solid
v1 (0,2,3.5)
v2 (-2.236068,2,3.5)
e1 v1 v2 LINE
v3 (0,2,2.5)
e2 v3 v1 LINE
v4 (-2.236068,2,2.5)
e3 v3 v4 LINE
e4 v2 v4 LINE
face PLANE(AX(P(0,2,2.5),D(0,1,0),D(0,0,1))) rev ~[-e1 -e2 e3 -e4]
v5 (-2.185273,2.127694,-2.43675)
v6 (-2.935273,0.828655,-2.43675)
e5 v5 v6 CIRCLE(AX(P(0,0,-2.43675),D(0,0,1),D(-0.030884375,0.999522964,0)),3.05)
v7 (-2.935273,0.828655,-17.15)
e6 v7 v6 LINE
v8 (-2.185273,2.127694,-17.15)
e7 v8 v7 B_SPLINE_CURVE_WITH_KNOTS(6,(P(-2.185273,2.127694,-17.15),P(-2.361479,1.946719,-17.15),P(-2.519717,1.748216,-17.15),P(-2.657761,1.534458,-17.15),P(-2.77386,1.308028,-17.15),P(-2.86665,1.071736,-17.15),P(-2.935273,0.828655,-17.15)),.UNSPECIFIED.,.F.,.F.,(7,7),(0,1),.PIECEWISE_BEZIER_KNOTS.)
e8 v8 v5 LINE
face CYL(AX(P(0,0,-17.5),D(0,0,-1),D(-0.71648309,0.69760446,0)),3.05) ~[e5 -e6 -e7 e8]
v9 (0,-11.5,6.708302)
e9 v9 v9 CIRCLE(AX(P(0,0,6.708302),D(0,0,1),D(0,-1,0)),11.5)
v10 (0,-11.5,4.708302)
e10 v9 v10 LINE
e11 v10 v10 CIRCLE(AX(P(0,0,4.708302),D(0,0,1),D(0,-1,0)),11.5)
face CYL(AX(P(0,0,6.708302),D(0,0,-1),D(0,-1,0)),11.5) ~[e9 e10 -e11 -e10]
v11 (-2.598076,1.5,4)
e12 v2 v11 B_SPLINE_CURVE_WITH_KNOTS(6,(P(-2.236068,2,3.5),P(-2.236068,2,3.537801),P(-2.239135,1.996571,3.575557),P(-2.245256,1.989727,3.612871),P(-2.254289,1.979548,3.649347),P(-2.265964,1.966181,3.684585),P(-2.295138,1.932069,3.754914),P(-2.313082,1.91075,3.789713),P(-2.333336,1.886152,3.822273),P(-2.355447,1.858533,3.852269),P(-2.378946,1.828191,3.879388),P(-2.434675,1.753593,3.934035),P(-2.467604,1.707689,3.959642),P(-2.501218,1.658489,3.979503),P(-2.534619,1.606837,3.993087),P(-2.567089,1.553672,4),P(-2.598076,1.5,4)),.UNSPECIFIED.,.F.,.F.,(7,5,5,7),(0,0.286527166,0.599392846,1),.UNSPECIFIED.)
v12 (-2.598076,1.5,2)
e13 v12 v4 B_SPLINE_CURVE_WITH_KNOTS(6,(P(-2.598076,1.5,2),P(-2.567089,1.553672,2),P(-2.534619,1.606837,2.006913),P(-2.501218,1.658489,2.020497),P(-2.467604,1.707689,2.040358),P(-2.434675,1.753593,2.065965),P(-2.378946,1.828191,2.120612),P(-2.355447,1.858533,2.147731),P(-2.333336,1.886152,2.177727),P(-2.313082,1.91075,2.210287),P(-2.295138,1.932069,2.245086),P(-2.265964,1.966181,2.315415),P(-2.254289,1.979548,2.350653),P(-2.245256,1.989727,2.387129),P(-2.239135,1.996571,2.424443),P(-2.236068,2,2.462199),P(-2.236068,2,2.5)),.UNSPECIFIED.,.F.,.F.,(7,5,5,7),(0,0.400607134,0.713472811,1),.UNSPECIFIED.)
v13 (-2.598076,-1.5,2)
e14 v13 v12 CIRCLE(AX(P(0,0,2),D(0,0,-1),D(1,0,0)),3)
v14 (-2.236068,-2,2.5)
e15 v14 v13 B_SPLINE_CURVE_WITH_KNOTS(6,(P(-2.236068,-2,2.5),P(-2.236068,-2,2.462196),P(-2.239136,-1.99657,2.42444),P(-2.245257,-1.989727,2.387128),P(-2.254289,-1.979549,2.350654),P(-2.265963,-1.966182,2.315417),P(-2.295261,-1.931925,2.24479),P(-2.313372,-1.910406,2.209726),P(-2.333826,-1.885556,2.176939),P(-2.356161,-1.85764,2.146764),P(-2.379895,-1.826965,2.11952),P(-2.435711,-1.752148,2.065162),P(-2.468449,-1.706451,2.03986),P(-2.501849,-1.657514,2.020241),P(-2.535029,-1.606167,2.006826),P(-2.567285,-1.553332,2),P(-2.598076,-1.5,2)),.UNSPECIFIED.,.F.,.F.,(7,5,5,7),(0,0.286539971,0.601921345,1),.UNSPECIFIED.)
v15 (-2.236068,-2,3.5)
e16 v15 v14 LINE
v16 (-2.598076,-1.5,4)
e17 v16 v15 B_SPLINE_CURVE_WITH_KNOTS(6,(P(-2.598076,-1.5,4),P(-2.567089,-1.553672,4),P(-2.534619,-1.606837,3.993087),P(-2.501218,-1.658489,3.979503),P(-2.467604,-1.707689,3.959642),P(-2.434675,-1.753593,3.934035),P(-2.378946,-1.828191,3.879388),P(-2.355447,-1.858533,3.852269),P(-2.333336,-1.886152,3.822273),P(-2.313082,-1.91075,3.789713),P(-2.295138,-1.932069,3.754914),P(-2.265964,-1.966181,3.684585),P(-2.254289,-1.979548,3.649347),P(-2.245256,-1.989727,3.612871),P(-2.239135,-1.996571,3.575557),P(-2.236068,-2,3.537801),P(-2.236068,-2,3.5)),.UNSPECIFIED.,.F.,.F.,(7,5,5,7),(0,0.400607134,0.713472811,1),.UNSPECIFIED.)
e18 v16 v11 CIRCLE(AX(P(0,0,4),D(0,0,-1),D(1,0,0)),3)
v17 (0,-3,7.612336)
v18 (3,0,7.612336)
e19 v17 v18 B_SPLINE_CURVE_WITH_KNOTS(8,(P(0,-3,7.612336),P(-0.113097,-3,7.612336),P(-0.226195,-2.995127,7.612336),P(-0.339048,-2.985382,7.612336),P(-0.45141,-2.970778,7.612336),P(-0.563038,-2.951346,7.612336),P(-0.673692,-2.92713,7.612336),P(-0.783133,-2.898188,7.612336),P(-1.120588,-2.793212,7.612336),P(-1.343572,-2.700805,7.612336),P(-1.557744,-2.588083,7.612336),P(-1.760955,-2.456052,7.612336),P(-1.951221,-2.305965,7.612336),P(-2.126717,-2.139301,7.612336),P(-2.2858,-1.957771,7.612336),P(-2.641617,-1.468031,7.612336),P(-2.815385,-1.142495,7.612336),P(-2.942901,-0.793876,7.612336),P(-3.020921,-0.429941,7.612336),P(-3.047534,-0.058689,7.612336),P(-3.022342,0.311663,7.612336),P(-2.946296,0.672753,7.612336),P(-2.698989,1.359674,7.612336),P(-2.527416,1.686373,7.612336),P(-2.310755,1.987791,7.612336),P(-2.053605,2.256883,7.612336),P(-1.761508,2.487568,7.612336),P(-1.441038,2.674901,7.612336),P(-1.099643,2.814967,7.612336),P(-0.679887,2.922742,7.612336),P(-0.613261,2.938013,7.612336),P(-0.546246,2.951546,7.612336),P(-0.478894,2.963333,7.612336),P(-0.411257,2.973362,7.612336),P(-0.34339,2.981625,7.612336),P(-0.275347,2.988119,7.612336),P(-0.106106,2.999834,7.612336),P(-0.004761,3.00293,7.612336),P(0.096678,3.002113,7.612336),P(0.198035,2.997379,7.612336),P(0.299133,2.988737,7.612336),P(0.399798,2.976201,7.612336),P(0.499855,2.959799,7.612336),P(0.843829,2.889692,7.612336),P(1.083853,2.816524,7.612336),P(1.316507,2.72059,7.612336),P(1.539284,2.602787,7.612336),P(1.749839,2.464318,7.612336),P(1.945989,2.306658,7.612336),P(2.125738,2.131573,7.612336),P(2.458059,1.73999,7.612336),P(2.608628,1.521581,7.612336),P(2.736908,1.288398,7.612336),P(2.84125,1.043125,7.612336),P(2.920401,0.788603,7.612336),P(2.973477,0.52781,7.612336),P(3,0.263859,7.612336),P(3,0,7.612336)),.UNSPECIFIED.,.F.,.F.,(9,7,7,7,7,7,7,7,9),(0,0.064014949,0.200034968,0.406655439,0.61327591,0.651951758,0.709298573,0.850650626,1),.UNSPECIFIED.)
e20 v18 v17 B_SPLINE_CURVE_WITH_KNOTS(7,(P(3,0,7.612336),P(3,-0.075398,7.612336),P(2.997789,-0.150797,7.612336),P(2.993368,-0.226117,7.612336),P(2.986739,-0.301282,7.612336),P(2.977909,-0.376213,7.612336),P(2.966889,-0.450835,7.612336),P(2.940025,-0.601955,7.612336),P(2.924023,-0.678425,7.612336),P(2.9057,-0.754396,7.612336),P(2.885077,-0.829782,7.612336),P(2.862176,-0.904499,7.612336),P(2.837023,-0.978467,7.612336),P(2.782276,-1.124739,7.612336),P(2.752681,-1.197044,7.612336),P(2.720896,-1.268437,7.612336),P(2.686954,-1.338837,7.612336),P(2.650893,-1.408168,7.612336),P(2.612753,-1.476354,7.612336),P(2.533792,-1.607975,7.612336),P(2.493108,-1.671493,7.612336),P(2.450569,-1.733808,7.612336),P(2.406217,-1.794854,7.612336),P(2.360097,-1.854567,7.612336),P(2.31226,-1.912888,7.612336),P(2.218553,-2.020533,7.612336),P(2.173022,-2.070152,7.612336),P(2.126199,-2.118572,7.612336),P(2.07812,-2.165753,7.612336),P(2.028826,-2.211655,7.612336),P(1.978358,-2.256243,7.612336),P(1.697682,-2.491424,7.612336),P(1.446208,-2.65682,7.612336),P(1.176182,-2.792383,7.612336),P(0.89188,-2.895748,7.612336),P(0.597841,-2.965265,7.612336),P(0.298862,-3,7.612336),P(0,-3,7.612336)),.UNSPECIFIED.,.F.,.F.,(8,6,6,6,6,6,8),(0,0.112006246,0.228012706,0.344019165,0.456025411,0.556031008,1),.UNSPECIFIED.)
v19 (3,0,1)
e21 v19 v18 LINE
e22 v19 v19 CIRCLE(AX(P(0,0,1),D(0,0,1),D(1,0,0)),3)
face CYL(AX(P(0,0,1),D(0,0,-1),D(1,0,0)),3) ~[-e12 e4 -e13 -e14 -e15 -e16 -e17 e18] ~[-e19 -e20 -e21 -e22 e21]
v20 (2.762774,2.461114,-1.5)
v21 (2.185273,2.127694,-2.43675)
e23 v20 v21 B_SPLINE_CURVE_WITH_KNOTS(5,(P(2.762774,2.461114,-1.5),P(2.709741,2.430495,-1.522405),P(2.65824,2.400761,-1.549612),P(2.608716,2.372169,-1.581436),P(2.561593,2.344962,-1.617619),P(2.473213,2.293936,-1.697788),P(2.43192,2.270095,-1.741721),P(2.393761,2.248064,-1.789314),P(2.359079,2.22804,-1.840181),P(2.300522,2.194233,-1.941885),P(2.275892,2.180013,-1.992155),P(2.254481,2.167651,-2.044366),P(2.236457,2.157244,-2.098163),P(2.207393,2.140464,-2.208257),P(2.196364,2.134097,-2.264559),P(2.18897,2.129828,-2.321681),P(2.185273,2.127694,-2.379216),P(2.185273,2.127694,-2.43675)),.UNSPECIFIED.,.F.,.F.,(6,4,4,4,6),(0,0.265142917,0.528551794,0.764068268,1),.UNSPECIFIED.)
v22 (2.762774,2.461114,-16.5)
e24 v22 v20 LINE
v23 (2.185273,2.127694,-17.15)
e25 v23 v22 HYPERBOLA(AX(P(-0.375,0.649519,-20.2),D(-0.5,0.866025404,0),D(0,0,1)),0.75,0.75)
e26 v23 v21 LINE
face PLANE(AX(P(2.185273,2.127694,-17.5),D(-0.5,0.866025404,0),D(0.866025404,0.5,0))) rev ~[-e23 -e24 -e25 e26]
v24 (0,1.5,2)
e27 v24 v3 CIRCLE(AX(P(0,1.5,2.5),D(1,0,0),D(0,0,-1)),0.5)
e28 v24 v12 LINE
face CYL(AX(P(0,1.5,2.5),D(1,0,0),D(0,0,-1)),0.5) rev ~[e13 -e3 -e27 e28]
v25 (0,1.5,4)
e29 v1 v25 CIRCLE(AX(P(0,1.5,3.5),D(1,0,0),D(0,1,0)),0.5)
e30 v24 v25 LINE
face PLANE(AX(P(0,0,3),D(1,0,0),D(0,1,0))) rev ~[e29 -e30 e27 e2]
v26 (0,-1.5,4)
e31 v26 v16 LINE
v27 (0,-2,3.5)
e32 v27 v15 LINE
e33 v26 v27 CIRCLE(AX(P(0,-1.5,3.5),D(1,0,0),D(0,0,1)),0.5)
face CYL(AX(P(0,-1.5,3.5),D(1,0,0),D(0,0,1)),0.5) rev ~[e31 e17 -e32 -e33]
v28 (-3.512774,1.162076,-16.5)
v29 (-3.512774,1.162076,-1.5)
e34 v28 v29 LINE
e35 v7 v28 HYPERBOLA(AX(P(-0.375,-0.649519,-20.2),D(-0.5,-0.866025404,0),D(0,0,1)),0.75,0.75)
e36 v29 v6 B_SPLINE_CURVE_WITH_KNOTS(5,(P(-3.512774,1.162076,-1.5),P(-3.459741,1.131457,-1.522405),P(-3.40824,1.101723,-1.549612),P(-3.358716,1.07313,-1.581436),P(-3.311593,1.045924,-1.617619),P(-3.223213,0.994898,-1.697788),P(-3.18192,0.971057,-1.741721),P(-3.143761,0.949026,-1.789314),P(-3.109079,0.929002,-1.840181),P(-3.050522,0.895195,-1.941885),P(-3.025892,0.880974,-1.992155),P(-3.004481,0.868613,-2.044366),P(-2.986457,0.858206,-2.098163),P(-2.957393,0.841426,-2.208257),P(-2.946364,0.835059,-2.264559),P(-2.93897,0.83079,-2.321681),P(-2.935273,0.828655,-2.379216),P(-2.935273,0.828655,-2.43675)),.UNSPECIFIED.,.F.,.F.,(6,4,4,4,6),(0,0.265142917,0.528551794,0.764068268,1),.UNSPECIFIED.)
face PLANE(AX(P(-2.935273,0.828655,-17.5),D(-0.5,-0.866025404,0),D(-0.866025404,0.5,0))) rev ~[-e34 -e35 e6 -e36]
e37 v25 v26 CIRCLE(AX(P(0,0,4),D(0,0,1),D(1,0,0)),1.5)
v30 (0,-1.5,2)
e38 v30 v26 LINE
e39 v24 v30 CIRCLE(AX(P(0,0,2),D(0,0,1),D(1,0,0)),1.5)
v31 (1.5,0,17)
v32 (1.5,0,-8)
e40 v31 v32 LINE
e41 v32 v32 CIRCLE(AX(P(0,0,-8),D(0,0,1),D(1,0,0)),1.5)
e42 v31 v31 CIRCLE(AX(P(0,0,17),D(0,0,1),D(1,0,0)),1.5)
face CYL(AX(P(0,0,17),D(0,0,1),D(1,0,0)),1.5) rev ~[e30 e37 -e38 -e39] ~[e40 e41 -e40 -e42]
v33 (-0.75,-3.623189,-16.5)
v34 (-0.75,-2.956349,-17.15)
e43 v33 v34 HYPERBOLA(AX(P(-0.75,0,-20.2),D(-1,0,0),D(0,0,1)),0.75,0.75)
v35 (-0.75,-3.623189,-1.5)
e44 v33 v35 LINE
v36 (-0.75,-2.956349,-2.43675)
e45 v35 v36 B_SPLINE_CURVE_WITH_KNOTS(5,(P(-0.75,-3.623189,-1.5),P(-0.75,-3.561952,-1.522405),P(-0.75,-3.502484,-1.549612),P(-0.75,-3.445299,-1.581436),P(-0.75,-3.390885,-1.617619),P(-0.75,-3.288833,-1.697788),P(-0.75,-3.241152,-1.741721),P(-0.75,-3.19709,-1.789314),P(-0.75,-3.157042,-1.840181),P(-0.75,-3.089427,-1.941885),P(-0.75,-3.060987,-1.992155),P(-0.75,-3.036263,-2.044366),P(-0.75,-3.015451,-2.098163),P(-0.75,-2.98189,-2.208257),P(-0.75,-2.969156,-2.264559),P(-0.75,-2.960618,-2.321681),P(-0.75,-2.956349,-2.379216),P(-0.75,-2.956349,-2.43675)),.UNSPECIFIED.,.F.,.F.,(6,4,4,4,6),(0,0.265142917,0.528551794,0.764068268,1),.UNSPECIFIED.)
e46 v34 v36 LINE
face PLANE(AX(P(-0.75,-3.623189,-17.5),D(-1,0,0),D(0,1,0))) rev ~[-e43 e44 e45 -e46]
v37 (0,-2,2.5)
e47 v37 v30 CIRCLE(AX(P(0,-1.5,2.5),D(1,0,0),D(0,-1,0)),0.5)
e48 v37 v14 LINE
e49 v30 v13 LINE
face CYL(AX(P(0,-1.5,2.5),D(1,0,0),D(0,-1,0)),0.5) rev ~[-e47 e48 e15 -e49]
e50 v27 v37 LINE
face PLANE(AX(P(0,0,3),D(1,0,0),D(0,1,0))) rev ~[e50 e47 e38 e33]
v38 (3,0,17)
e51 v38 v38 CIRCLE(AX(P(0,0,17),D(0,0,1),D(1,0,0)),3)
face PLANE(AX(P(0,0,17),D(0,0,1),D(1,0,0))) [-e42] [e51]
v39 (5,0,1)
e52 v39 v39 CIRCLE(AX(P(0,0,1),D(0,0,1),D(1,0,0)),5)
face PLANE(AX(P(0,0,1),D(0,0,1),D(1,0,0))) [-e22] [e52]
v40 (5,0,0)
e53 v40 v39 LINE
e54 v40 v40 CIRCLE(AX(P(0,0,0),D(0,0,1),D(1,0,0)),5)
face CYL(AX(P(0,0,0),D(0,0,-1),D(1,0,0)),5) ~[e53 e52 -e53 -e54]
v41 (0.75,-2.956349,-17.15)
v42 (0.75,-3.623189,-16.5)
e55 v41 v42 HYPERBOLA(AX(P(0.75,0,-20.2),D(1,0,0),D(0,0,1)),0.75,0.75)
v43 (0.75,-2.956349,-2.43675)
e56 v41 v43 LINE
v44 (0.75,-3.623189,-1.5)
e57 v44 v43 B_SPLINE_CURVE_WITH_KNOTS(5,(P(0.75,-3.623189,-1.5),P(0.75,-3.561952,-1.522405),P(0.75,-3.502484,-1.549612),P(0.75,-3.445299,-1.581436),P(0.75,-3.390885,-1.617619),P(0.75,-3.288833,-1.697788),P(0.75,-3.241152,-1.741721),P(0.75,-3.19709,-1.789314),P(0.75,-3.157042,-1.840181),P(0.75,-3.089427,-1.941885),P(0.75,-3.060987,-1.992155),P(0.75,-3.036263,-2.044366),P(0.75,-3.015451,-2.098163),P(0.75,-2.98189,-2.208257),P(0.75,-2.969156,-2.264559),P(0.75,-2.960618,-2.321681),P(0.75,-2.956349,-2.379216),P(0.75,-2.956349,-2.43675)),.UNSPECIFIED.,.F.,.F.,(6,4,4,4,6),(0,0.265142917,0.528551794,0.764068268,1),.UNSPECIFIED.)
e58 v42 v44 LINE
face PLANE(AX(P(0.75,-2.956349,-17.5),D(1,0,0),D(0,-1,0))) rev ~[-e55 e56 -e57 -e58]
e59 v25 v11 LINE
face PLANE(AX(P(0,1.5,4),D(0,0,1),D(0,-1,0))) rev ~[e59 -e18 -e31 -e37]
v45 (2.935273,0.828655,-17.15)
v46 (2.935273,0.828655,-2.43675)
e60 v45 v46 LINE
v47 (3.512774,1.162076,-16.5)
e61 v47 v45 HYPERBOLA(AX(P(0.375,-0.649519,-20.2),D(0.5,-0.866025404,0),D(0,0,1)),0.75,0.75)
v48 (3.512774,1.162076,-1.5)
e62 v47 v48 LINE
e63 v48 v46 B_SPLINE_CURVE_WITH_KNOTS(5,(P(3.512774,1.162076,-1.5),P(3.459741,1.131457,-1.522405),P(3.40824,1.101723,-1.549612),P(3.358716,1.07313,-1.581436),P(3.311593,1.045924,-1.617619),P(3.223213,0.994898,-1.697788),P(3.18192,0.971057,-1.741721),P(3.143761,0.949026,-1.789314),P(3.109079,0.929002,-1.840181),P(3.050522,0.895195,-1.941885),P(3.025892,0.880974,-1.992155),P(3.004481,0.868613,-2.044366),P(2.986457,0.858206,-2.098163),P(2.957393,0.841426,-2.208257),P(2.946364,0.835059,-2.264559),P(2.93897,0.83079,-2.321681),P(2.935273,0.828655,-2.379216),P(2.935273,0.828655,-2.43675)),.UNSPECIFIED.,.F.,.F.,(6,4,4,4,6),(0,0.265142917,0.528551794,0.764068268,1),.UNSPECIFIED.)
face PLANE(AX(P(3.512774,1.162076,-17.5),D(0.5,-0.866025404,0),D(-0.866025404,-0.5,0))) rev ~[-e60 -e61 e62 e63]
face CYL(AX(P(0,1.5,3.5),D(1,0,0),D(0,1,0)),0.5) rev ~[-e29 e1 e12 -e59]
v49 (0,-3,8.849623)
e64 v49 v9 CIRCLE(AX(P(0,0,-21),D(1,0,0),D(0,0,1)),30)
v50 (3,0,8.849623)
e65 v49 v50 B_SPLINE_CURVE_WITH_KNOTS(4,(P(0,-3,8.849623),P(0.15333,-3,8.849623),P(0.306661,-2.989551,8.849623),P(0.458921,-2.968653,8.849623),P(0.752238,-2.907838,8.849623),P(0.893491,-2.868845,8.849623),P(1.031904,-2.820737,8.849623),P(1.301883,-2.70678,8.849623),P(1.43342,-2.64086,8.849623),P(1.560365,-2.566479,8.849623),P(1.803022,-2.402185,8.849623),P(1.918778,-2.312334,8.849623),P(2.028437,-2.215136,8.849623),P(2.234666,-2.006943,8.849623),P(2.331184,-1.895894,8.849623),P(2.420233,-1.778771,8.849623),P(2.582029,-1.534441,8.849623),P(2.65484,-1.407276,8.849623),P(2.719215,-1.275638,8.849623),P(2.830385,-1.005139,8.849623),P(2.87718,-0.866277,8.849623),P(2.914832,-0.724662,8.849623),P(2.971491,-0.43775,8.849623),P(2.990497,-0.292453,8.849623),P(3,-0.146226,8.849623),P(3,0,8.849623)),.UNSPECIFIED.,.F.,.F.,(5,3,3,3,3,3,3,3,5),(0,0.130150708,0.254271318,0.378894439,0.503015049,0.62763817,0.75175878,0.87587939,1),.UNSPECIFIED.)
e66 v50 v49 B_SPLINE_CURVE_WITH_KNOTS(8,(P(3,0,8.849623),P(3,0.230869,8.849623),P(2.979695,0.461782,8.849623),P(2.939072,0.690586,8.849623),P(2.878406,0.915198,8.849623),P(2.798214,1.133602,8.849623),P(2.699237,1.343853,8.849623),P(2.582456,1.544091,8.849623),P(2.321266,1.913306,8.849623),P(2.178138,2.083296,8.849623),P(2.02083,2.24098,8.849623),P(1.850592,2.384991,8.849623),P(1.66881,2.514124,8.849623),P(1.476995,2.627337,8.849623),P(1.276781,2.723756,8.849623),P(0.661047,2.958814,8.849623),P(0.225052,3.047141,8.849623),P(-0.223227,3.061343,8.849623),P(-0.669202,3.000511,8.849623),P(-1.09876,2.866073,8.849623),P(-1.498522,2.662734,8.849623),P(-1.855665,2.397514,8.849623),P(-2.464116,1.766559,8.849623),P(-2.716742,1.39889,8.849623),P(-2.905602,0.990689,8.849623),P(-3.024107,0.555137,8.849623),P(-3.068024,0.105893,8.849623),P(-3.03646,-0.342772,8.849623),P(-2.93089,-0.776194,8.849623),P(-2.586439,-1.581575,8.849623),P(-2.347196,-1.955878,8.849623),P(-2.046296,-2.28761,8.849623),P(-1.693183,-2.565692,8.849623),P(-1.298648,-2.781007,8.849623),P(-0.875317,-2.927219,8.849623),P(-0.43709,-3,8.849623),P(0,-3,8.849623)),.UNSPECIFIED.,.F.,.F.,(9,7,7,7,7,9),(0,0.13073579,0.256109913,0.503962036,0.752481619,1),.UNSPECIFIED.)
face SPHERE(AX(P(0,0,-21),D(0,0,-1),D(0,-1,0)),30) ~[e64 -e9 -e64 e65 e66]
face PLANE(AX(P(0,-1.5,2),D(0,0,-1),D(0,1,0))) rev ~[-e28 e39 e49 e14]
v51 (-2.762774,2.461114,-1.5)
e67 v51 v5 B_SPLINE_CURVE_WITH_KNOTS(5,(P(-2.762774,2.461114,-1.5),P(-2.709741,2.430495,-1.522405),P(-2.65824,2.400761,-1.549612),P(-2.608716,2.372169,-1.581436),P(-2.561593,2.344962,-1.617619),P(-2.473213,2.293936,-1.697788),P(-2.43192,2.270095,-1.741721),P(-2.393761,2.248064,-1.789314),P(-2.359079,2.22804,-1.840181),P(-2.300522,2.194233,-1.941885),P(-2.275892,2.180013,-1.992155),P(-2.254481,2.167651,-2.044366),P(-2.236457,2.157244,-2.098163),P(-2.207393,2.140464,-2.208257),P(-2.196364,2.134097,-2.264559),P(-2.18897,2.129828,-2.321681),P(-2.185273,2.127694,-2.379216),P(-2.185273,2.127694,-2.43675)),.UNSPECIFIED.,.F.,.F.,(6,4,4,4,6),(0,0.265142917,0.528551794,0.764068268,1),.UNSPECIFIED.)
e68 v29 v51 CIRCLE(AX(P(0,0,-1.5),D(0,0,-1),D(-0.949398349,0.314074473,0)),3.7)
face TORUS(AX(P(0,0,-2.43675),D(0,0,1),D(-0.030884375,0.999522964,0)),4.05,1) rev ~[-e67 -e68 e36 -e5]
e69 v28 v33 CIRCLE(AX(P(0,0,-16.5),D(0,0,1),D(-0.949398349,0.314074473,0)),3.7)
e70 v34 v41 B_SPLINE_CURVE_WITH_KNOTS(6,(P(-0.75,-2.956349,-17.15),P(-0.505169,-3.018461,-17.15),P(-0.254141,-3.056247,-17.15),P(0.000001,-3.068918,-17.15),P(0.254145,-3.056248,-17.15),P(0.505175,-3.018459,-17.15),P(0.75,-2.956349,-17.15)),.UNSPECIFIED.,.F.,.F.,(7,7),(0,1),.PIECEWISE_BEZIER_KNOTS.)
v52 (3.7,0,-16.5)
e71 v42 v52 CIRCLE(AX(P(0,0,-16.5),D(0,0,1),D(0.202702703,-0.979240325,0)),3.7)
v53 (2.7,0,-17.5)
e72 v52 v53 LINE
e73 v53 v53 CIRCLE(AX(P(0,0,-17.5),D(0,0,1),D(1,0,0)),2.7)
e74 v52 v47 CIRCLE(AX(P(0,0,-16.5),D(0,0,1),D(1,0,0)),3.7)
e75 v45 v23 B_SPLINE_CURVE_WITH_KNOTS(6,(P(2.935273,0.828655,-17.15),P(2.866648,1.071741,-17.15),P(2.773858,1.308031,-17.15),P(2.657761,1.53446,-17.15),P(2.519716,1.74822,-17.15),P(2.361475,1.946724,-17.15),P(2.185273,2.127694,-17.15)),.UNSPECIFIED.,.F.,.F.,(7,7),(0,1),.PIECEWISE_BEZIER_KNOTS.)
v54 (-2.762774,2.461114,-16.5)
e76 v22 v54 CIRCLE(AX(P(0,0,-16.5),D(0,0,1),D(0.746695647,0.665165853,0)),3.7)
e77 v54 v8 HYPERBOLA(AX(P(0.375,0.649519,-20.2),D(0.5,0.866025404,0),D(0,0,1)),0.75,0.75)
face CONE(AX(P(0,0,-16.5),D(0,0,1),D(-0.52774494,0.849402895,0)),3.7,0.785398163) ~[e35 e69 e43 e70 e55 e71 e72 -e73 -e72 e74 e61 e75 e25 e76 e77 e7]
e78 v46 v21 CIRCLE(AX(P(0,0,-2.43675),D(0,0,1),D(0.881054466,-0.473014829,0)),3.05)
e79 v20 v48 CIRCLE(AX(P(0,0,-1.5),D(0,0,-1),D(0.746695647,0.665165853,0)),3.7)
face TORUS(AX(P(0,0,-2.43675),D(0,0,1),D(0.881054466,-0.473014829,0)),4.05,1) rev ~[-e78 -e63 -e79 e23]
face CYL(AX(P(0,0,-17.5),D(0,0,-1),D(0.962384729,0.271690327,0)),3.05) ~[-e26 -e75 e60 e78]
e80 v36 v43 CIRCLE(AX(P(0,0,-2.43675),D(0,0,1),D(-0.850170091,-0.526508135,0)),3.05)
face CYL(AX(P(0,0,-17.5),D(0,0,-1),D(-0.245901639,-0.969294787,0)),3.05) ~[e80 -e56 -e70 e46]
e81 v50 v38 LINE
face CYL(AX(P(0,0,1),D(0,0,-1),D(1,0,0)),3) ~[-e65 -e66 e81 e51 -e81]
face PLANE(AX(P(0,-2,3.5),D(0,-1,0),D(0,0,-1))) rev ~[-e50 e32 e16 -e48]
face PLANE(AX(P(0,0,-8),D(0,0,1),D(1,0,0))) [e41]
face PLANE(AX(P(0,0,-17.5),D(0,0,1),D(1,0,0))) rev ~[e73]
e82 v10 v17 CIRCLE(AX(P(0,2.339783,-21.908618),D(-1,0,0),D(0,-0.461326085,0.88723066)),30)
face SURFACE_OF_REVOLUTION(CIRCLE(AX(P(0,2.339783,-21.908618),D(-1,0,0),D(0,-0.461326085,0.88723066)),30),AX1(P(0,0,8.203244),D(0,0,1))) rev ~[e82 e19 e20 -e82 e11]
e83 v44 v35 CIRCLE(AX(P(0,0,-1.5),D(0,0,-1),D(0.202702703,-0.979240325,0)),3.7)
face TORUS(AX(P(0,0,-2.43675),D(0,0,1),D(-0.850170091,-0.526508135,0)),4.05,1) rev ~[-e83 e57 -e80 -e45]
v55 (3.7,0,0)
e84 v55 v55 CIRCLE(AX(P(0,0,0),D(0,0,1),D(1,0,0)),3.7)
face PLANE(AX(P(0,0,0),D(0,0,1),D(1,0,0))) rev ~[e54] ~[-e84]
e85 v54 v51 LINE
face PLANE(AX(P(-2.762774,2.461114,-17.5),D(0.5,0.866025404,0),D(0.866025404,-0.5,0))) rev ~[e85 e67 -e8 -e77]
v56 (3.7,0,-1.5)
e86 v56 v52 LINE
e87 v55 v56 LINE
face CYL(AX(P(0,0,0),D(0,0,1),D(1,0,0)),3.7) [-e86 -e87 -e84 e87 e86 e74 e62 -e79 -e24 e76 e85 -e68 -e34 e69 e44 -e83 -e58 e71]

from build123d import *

# Parameters (mm, degrees)
F0_R        = 3.7
F1_DEPTH    = 17.5
F3_DEPTH    = 16
F4_T2_ANGLE = 116.4603484981
F4_T4_ANGLE = 116.4603484981
F4_T6_ANGLE = 116.4603484981
F5_T2_ANGLE = 176.2935685117
F5_T4_ANGLE = 176.2935685117
F5_T6_ANGLE = 58.1290115734
F5_T8_ANGLE = 118.1404591149
F6_R        = 5
F7_DEPTH    = 1
F8_R        = 3
F9_DEPTH    = 16
F14_DEPTH   = 25
F15_R       = 1.5
F16_DEPTH   = 25


# Not quite as in the source:
# - a fillet or chamfer that OpenCascade refuses, or shapes differently, is made with other operations: its cross-section is extruded or revolved along the edge and cut away or added


with BuildPart() as f1:
    # F0 (on Top) → F1 (new body)
    with BuildSketch(Plane.XY):
        Circle(F0_R)
    extrude(amount=-F1_DEPTH)

    # F2 (on face) → F3 (cut)
    with BuildSketch(Plane(origin=(0, 0, -17.5), x_dir=(1, 0, 0), z_dir=(0, 0, -1))):
        with BuildLine():
            ThreePointArc((-2.1852734229, -2.1276936027), (-2.6413774815, -1.525), (-2.9352734229, -0.8286554971))
            Line((-2.9352734229, -0.8286554971), (-3.5127738924, -1.1620755486))
            ThreePointArc((-3.5127738924, -1.1620755486), (-3.204293994, -1.85), (-2.7627738924, -2.4611136543))
            Line((-2.7627738924, -2.4611136543), (-2.1852734229, -2.1276936027))
        make_face()
        with BuildLine():
            Line((-0.75, 3.6231892029), (-0.75, 2.9563490998))
            ThreePointArc((-0.75, 2.9563490998), (0, 3.05), (0.75, 2.9563490998))
            Line((0.75, 2.9563490998), (0.75, 3.6231892029))
            ThreePointArc((0.75, 3.6231892029), (0, 3.7), (-0.75, 3.6231892029))
        make_face()
        with BuildLine():
            Line((2.1852734229, -2.1276936027), (2.7627738924, -2.4611136543))
            ThreePointArc((2.7627738924, -2.4611136543), (3.204293994, -1.85), (3.5127738924, -1.1620755486))
            Line((3.5127738924, -1.1620755486), (2.9352734229, -0.8286554971))
            ThreePointArc((2.9352734229, -0.8286554971), (2.6413774815, -1.525), (2.1852734229, -2.1276936027))
        make_face()
    extrude(amount=-F3_DEPTH, mode=Mode.SUBTRACT)

    # F4: fillet of radius 1 on 3 edges, made by hand

    # F4_s1 → F4_t2 (revolve)
    with BuildSketch(Plane(origin=(0, 0, 0), x_dir=(0, 0, 1), z_dir=(-0.473014829, -0.8810544657, 0))):
        with BuildLine():
            ThreePointArc((-1.5, -3.7), (-1.8666619872, -3.2284161637), (-2.4367496998, -3.05))
            Line((-2.4367496998, -3.05), (-1.5, -3.05))
            Line((-1.5, -3.05), (-1.5, -3.7))
        make_face()
    revolve(axis=Axis((0, 0, -1.5), (0, 0, 1)), revolution_arc=F4_T2_ANGLE)

    # F4_s3 → F4_t4 (revolve)
    with BuildSketch(Plane(origin=(0, 0, 0), x_dir=(0, 0, 1), z_dir=(-0.526508135, 0.8501700911, 0))):
        with BuildLine():
            ThreePointArc((-1.5, -3.7), (-1.8666619872, -3.2284161637), (-2.4367496998, -3.05))
            Line((-2.4367496998, -3.05), (-1.5, -3.05))
            Line((-1.5, -3.05), (-1.5, -3.7))
        make_face()
    revolve(axis=Axis((0, 0, -1.5), (0, 0, 1)), revolution_arc=F4_T4_ANGLE)

    # F4_s5 → F4_t6 (revolve)
    with BuildSketch(Plane(origin=(0, 0, 0), x_dir=(0, 0, 1), z_dir=(0.9995229639, 0.0308843746, 0))):
        with BuildLine():
            ThreePointArc((-1.5, -3.7), (-1.8666619872, -3.2284161637), (-2.4367496998, -3.05))
            Line((-2.4367496998, -3.05), (-1.5, -3.05))
            Line((-1.5, -3.05), (-1.5, -3.7))
        make_face()
    revolve(axis=Axis((0, 0, -1.5), (0, 0, 1)), revolution_arc=F4_T6_ANGLE)

    # F5: chamfer of 1 on 4 edges, made by hand

    # F5_s1 → F5_t2 (revolve, cut)
    with BuildSketch(Plane(origin=(0, 0, 0), x_dir=(0, 0, 1), z_dir=(0.8494028952, 0.5277449399, 0))):
        Polygon((-16.5, -3.7), (-17.5, -2.7), (-17.5, -3.7), align=None)
    revolve(axis=Axis((0, 0, -17.5), (0, 0, 1)), revolution_arc=F5_T2_ANGLE, mode=Mode.SUBTRACT)

    # F5_s3 → F5_t4 (revolve, cut)
    with BuildSketch(Plane(origin=(0, 0, 0), x_dir=(0, 0, 1), z_dir=(0.032339077, -0.9994769553, 0))):
        Polygon((-16.5, -3.7), (-17.5, -2.7), (-17.5, -3.7), align=None)
    revolve(axis=Axis((0, 0, -17.5), (0, 0, 1)), revolution_arc=F5_T4_ANGLE, mode=Mode.SUBTRACT)

    # F5_s5 → F5_t6 (revolve, cut)
    with BuildSketch(Plane.XZ):
        Polygon((3.7, -16.5), (2.7, -17.5), (3.7, -17.5), align=None)
    revolve(axis=Axis((0, 0, -17.5), (0, 0, 1)), revolution_arc=F5_T6_ANGLE, mode=Mode.SUBTRACT)

    # F5_s7 → F5_t8 (revolve, cut)
    with BuildSketch(Plane(origin=(0, 0, 0), x_dir=(0, 0, 1), z_dir=(-0.8817940435, 0.471634673, 0))):
        Polygon((-16.5, -3.7), (-17.5, -2.7), (-17.5, -3.7), align=None)
    revolve(axis=Axis((0, 0, -17.5), (0, 0, 1)), revolution_arc=F5_T8_ANGLE, mode=Mode.SUBTRACT)

    # F6 (on face) → F7 (join)
    with BuildSketch(Plane.XY):
        Circle(F6_R)
    extrude(amount=F7_DEPTH)

    # F8 (on face) → F9 (join)
    with BuildSketch(Plane.XY.offset(1)):
        Circle(F8_R)
    extrude(amount=F9_DEPTH)

    # F10 (on Right) → F12 (revolve)
    with BuildSketch(Plane.YZ):
        with BuildLine():
            Line((0, 8), (0, 9))
            ThreePointArc((0, 9), (-5.863059775, 8.4214977538), (-11.5, 6.708302005))
            Line((-11.5, 6.708302005), (-11.5, 4.708302005))
            ThreePointArc((-11.5, 4.708302005), (-5.9157247408, 6.9331331941), (0, 8))
        make_face()
    revolve(axis=Axis((0, 0, 8.2032438368), (0, 0, 1)))

    # F13 (on Right) → F14 (cut)
    with BuildSketch(Plane.YZ):
        with BuildLine():
            ThreePointArc((2, 3.5), (1.8535533906, 3.8535533906), (1.5, 4))
            Line((1.5, 4), (-1.5, 4))
            ThreePointArc((-1.5, 4), (-1.8535533906, 3.8535533906), (-2, 3.5))
            Line((-2, 3.5), (-2, 2.5))
            ThreePointArc((-2, 2.5), (-1.8535533906, 2.1464466094), (-1.5, 2))
            Line((-1.5, 2), (1.5, 2))
            ThreePointArc((1.5, 2), (1.8535533906, 2.1464466094), (2, 2.5))
            Line((2, 2.5), (2, 3.5))
        make_face()
    extrude(amount=-F14_DEPTH, mode=Mode.SUBTRACT)

    # F15 (on face) → F16 (cut)
    with BuildSketch(Plane.XY.offset(17)):
        Circle(F15_R)
    extrude(amount=-F16_DEPTH, mode=Mode.SUBTRACT)


solid = f1.part
